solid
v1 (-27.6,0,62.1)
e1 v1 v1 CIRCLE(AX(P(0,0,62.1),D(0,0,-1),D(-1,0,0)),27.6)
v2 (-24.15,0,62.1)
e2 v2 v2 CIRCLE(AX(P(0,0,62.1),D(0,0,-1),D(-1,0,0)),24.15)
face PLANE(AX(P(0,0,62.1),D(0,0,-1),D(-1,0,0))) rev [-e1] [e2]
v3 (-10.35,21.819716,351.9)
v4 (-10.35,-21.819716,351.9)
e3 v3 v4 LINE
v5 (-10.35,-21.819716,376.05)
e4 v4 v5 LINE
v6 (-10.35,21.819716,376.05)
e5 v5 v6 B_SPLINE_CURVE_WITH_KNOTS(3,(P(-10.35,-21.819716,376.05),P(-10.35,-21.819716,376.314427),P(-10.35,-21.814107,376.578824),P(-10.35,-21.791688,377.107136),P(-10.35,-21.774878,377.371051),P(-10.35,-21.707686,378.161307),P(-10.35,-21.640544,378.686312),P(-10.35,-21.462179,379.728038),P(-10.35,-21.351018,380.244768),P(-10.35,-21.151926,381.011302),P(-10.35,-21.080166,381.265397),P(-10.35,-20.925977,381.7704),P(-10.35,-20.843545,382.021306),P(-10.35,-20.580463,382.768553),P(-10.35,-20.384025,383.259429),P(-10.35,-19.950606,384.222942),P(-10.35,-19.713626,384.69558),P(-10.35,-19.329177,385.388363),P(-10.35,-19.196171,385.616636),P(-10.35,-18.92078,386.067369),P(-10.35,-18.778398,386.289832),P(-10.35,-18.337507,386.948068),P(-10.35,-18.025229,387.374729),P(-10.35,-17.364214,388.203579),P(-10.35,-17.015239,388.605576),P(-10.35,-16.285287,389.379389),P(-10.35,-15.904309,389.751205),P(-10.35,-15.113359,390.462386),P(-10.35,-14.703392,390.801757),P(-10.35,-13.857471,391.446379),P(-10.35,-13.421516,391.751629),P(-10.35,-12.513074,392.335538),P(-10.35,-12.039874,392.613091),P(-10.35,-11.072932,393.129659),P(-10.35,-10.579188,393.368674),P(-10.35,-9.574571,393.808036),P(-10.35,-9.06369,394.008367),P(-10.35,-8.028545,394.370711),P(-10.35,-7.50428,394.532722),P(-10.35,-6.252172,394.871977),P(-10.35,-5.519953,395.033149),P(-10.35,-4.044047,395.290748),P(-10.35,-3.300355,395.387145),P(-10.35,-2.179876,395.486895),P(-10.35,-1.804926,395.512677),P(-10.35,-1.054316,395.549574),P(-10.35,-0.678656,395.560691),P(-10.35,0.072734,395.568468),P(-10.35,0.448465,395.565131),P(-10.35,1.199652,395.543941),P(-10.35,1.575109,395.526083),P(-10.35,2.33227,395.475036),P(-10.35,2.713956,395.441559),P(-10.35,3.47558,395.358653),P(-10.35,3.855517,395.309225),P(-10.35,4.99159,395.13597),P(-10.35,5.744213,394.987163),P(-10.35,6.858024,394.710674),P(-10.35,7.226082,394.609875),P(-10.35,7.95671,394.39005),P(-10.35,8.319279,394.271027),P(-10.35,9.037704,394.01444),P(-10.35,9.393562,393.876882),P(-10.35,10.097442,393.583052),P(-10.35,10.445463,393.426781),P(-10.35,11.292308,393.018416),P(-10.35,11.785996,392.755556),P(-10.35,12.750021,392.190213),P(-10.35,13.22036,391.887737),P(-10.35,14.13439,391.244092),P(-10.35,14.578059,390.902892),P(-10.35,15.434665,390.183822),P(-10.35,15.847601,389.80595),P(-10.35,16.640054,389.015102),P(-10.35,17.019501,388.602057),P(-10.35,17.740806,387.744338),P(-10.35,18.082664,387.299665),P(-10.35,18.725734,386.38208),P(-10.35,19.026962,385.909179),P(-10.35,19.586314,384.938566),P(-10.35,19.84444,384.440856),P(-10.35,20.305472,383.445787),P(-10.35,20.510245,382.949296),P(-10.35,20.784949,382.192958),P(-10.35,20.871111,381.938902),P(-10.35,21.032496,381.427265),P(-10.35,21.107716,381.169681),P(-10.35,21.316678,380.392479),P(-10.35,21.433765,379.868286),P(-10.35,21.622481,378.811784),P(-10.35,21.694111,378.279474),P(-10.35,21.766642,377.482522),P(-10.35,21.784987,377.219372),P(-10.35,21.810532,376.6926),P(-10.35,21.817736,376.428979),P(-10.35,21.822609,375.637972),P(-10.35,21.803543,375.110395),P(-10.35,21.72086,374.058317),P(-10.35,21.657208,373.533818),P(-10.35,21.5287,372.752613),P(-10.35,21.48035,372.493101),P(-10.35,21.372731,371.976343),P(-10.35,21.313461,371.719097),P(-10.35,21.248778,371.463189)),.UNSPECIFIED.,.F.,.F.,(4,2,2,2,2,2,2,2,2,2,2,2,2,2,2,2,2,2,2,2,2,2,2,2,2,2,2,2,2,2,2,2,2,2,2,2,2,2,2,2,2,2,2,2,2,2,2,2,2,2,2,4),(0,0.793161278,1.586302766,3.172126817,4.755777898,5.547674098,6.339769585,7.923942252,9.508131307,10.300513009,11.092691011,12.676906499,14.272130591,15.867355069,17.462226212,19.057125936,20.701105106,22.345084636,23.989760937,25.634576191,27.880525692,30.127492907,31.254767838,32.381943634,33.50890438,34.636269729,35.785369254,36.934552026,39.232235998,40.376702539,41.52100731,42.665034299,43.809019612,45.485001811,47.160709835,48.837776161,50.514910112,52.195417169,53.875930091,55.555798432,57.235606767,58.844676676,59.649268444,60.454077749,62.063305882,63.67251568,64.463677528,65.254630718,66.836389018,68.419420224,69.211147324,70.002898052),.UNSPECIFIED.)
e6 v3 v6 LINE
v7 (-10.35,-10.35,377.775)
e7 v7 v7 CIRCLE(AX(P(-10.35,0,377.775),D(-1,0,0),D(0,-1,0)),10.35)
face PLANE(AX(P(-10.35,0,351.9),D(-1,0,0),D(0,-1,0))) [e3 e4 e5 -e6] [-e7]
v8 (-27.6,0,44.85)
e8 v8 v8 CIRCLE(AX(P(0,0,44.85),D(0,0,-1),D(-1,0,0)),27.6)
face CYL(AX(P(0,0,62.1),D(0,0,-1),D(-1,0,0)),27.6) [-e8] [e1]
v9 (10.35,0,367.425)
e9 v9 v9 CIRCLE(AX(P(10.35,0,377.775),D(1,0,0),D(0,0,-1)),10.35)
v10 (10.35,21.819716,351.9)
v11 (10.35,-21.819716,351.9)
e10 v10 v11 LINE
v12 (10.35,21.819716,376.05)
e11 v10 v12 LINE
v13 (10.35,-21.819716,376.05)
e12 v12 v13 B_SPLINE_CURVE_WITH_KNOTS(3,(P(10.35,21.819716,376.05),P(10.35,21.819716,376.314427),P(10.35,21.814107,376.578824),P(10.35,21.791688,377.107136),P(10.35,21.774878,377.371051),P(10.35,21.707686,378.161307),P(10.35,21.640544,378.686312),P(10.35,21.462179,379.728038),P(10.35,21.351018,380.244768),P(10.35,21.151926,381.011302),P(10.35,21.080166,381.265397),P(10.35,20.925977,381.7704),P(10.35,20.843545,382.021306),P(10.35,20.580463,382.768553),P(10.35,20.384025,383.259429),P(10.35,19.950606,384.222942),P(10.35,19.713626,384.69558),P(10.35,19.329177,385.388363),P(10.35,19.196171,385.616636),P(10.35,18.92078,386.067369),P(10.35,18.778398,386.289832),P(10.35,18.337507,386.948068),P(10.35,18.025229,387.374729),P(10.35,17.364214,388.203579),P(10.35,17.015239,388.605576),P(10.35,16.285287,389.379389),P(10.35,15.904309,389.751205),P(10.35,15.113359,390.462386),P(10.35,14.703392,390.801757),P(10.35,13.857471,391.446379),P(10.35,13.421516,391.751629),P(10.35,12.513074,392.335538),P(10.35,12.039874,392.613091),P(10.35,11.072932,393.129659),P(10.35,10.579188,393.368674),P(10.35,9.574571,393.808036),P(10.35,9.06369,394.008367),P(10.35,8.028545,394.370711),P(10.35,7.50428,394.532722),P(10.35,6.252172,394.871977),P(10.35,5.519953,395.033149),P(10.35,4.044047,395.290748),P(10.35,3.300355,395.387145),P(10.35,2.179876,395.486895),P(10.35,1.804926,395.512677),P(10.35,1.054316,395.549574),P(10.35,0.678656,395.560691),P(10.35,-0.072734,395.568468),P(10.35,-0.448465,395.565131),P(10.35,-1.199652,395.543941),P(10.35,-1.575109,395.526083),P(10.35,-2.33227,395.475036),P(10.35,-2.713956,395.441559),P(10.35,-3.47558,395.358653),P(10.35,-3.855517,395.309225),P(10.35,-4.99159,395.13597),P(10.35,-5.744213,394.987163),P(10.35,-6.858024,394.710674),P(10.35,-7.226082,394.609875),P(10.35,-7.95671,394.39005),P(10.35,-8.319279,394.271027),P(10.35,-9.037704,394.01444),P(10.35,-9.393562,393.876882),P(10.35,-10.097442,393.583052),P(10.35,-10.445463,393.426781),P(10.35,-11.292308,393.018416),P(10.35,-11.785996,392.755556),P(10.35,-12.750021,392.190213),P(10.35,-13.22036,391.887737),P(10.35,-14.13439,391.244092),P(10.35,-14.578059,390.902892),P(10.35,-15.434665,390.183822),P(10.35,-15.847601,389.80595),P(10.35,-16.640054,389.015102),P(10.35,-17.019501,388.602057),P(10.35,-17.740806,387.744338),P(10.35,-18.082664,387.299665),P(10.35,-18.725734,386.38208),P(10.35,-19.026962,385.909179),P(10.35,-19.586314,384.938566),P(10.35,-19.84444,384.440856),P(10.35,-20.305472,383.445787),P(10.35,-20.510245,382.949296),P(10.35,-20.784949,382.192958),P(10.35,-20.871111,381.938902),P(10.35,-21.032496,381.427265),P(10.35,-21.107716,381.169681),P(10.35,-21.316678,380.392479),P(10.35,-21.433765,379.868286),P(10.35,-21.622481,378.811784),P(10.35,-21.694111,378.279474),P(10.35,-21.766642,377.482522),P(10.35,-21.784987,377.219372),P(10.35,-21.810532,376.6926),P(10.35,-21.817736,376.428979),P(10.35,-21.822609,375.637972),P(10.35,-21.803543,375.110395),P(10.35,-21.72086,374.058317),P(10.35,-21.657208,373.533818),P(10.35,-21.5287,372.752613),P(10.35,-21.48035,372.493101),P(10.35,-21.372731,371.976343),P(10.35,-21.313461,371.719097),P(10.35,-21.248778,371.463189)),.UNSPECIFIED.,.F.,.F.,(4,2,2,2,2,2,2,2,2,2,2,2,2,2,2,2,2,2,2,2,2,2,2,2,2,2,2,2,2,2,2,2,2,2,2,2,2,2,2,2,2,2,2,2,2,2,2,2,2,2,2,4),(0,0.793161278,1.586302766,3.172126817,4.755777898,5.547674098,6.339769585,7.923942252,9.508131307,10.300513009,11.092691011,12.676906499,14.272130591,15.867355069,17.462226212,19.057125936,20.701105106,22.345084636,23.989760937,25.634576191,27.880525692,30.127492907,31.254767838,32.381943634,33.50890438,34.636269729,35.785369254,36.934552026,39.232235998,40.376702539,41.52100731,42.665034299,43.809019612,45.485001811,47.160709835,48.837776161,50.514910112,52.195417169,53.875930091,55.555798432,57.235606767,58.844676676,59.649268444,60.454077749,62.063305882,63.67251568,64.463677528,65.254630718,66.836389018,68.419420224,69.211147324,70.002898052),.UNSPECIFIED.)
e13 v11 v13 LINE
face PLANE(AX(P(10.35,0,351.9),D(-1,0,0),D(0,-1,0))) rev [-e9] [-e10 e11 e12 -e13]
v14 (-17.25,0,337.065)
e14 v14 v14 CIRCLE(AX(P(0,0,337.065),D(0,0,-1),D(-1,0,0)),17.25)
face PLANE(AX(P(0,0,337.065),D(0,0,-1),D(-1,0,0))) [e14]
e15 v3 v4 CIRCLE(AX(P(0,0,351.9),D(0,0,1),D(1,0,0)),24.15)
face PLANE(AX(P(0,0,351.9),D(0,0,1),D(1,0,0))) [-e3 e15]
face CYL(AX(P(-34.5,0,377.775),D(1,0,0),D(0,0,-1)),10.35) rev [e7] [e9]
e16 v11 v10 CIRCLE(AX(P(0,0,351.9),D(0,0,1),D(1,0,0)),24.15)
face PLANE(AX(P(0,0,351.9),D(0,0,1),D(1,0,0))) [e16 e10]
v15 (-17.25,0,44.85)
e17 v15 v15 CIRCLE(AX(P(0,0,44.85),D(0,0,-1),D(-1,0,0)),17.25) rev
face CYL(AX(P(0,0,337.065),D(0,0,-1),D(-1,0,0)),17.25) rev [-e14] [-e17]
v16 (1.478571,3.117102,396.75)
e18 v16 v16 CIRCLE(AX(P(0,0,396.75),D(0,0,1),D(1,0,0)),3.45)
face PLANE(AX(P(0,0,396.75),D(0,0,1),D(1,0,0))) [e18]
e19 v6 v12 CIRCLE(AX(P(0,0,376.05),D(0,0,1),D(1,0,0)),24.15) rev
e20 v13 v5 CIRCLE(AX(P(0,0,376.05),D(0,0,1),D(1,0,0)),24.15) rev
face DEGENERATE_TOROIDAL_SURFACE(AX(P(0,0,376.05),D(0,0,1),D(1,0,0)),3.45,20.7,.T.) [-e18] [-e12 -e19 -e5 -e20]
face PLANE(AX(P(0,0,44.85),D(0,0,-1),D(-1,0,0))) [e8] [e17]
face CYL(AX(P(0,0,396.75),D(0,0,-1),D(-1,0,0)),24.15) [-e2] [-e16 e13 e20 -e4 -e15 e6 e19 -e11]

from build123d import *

# Parameters (mm, degrees)
SKETCH_1_R          = 70
EXTRUDE_2_DEPTH     = 1150
CUT_EXTRUDE_START   = -130
CUT_EXTRUDE_1_DEPTH = 130
SKETCH_3_R          = 30
CUT_EXTRUDE_2_DEPTH = 130
FILLET_1_R          = 60
SKETCH_4_R          = 50
CUT_EXTRUDE_3_DEPTH = 977
SKETCH_5_R          = 79.849645552
CUT_EXTRUDE_4_DEPTH = 100
SKETCH_6_R          = 77.974086693
CUT_EXTRUDE_5_DEPTH = 30
SKETCH_7_R          = 80
SKETCH_7_R_2        = 70
EXTRUDE_4_DEPTH     = 50
SCALE_1_SCALE       = 0.345


with BuildPart() as part:
    # 草图1 → 凸台-拉伸2 (new body)
    with BuildSketch(Plane.XY):
        Circle(SKETCH_1_R)
    extrude(amount=EXTRUDE_2_DEPTH)

    # 草图2 → 切除-拉伸1 (cut)
    with BuildSketch(Plane.XY.offset(1150).offset(CUT_EXTRUDE_START)):
        with BuildLine():
            ThreePointArc((70, 0), (59.160797831, 37.416573868), (30, 63.245553203))
            Line((30, 63.245553203), (30, -63.245553203))
            ThreePointArc((30, -63.245553203), (59.160797831, -37.416573868), (70, 0))
        make_face()
        with BuildLine():
            Line((-30, -63.245553203), (-30, 63.245553203))
            ThreePointArc((-30, 63.245553203), (-70, 0), (-30, -63.245553203))
        make_face()
    extrude(amount=CUT_EXTRUDE_1_DEPTH, mode=Mode.SUBTRACT)

    # 草图3 → 切除-拉伸2 (cut)
    with BuildSketch(Plane(origin=(30, 0, 0), x_dir=(0, 0, -1), z_dir=(1, 0, 0))):
        with Locations((-1095, 0)):
            Circle(SKETCH_3_R)
    extrude(amount=-CUT_EXTRUDE_2_DEPTH, mode=Mode.SUBTRACT)

    # 圆角1
    # the kernel refuses this fillet: 60 mm, written as the material it takes off along each edge
    with BuildSketch(Plane(origin=(0, 0, 1150), x_dir=(0.527411317590309, -0.8496100882626421, 0), z_dir=(-0.8496100882626421, -0.527411317590309, 0))) as fillet_1_piece_1:
        with BuildLine():
            CenterArc((70 - FILLET_1_R, -FILLET_1_R), FILLET_1_R, 0, 90)
            Line((70 - FILLET_1_R, 0), (70, 0))
            Line((70, 0), (70, -FILLET_1_R))
        make_face()
    revolve(axis=Axis((0, 0, 1150), (0, 0, 1)), revolution_arc=296.338571462, mode=Mode.SUBTRACT)
    with BuildSketch(Plane(origin=(0, 0, 1150), x_dir=(-0.527411317590308, 0.8496100882626425, 0), z_dir=(0.8496100882626425, 0.527411317590308, 0))) as fillet_1_piece_2:
        with BuildLine():
            CenterArc((70 - FILLET_1_R, -FILLET_1_R), FILLET_1_R, 0, 90)
            Line((70 - FILLET_1_R, 0), (70, 0))
            Line((70, 0), (70, -FILLET_1_R))
        make_face()
    revolve(axis=Axis((0, 0, 1150), (0, 0, 1)), revolution_arc=296.338571462, mode=Mode.SUBTRACT)

    # 草图4 → 切除-拉伸3 (cut)
    with BuildSketch(Plane(origin=(0, 0, 0), x_dir=(-1, 0, 0), z_dir=(0, 0, -1))):
        Circle(SKETCH_4_R)
    extrude(amount=-CUT_EXTRUDE_3_DEPTH, mode=Mode.SUBTRACT)

    # 草图5 → 切除-拉伸4 (cut)
    with BuildSketch(Plane(origin=(0, 0, 0), x_dir=(-1, 0, 0), z_dir=(0, 0, -1))):
        Circle(SKETCH_5_R)
    extrude(amount=-CUT_EXTRUDE_4_DEPTH, mode=Mode.SUBTRACT)

    # 草图6 → 切除-拉伸5 (cut)
    with BuildSketch(Plane(origin=(0, 0, 100), x_dir=(-1, 0, 0), z_dir=(0, 0, -1))):
        Circle(SKETCH_6_R)
    extrude(amount=-CUT_EXTRUDE_5_DEPTH, mode=Mode.SUBTRACT)

    # 草图7 → 凸台-拉伸4 (add)
    with BuildSketch(Plane(origin=(0, 0, 130), x_dir=(-1, 0, 0), z_dir=(0, 0, -1))):
        Circle(SKETCH_7_R)
        Circle(SKETCH_7_R_2, mode=Mode.SUBTRACT)
    extrude(amount=-EXTRUDE_4_DEPTH)


with BuildPart() as part_1:
    # 缩放比例1: scaled about (0, 0, 0)
    add(part.part.scale(SCALE_1_SCALE))


solid = part_1.part
